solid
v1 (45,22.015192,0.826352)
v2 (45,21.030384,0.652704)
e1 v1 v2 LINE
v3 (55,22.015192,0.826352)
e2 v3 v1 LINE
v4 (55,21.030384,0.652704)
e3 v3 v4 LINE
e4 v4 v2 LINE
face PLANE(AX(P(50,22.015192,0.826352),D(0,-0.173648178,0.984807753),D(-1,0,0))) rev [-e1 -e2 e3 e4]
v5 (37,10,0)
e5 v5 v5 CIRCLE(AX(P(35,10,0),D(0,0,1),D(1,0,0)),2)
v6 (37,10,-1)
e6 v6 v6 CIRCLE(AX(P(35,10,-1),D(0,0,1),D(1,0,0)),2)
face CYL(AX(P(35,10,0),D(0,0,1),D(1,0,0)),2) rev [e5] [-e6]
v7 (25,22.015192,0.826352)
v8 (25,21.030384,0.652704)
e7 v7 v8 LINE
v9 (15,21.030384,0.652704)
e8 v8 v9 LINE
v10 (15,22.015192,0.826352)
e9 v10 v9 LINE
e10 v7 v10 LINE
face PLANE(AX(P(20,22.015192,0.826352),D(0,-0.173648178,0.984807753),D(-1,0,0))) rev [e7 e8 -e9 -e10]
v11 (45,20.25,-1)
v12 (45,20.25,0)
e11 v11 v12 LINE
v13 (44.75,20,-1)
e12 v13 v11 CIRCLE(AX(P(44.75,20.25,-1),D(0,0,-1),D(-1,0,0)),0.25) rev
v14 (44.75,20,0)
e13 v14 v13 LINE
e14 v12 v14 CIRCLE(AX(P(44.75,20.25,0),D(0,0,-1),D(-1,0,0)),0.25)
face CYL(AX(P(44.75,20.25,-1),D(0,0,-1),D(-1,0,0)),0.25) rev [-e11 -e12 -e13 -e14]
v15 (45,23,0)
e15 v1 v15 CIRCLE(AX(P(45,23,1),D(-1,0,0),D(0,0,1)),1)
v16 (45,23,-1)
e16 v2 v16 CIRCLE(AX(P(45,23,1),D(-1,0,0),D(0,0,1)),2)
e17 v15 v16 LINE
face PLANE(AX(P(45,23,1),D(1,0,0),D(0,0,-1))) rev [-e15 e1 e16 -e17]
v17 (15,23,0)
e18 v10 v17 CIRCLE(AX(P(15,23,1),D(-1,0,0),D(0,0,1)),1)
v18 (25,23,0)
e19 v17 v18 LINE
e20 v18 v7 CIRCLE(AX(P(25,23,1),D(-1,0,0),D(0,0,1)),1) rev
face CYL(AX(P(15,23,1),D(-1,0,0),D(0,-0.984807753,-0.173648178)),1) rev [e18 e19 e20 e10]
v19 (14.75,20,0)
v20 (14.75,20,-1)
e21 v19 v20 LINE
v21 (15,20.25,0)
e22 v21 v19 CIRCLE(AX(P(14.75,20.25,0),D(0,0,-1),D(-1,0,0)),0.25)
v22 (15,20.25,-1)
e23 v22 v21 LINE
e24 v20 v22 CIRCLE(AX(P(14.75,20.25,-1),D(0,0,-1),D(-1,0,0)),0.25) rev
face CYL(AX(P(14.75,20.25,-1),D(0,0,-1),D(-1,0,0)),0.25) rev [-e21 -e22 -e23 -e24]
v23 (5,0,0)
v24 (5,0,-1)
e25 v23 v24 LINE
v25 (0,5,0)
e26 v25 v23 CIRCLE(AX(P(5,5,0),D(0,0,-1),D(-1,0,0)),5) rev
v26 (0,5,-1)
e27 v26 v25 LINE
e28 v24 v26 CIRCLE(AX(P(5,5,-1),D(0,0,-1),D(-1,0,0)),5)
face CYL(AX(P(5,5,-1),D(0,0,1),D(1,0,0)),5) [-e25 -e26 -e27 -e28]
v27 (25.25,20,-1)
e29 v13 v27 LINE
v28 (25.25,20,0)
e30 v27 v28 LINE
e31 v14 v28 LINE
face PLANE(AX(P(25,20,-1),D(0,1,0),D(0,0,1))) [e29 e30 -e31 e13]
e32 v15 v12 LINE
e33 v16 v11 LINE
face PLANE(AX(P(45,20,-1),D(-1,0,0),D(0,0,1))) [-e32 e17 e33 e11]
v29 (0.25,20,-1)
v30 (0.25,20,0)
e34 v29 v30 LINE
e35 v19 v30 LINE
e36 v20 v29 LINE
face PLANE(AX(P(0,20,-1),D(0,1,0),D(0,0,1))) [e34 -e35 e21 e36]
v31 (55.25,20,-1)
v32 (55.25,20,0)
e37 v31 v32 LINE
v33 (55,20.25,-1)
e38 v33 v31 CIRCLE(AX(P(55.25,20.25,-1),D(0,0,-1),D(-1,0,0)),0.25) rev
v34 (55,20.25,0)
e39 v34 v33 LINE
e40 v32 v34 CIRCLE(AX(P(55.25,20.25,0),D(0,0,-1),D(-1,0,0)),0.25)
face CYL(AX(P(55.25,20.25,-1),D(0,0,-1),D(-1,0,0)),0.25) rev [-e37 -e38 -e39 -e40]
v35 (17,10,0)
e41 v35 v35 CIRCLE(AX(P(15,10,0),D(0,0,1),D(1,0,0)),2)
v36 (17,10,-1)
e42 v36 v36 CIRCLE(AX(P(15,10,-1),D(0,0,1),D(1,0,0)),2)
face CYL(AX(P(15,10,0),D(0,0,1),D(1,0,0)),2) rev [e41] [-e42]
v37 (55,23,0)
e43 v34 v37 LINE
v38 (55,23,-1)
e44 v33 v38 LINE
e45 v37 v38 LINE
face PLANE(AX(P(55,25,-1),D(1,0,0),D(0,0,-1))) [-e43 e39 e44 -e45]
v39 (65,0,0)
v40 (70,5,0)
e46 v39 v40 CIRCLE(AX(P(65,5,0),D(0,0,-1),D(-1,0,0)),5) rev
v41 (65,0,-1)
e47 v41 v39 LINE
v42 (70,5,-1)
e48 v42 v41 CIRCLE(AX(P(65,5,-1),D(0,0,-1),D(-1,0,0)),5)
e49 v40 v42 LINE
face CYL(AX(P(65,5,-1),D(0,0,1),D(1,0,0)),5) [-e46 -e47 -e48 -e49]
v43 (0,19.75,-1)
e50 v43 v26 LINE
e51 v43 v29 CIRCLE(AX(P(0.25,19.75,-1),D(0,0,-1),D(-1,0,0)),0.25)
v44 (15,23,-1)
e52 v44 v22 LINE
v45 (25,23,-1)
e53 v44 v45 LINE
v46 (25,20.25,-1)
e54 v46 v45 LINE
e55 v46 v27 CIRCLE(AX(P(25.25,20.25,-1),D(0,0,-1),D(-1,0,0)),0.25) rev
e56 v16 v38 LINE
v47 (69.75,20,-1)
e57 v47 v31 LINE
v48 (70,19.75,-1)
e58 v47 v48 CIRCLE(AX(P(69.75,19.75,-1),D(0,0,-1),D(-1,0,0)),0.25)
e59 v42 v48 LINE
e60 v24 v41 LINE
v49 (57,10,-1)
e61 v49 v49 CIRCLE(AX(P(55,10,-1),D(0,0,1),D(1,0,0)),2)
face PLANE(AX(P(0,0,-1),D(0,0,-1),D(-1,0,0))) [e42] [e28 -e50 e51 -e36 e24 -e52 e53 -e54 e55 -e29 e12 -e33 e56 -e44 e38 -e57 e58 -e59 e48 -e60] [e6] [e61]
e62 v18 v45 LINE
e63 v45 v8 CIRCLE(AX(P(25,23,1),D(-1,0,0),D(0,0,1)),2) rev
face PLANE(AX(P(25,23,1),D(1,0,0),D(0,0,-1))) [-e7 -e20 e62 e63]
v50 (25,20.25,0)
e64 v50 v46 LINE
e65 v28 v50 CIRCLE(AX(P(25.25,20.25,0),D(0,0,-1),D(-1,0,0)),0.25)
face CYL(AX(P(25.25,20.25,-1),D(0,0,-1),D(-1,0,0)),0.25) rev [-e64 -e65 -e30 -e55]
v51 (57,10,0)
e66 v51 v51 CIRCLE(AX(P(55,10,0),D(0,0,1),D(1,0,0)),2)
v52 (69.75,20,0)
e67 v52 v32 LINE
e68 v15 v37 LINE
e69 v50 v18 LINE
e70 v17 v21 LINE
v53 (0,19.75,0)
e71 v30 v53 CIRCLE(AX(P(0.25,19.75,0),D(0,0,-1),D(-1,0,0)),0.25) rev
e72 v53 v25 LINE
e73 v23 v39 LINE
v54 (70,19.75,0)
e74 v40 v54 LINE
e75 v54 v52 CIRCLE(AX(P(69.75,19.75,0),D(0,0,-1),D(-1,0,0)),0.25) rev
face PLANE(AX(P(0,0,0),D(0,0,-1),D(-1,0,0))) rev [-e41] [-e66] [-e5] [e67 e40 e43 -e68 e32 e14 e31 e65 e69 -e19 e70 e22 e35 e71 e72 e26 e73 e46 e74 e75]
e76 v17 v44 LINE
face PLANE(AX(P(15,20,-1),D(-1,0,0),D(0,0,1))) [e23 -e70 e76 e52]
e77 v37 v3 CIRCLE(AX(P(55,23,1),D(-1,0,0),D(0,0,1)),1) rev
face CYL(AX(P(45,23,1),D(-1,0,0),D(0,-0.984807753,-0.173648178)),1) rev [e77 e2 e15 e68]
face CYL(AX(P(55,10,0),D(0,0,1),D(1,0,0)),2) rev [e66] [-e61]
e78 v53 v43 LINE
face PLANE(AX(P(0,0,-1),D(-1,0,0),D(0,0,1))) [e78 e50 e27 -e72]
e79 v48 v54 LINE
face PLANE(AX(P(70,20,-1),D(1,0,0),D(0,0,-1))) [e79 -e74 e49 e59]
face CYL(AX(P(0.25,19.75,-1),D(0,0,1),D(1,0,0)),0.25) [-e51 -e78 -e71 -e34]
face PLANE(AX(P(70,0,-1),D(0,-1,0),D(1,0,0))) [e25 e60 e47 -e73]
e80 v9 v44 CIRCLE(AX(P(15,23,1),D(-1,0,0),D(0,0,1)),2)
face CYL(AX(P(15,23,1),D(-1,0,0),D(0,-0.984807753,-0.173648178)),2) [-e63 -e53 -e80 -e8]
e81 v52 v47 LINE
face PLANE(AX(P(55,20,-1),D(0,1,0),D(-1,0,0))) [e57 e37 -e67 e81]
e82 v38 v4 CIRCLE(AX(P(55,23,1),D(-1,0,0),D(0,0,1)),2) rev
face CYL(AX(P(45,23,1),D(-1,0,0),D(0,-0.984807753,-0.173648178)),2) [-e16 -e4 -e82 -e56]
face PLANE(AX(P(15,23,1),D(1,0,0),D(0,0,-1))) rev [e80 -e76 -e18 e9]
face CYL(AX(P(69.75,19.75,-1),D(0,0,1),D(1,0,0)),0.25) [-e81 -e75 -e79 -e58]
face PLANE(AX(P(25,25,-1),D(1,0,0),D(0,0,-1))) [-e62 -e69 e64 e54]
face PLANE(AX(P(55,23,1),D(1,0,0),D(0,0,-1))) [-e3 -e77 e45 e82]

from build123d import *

# Parameters (mm, degrees)
SM_BASE_FLANGE_1_DEPTH = 1
OTHER_START            = 15
OTHER_1_DEPTH          = 40
OTHER_1_2_DEPTH        = 10
OTHER_START_2          = 45
OTHER_1_3_DEPTH        = 10
HOLE_WIZARD_M12_1_D    = 4
FILLET_1_R             = 5
FILLET_2_R             = 0.25


# Read off the part's stored shape, not the designer's step: 햄1
# Sheet-metal steps are written as plain solids
with BuildPart() as part:
    # Sketch 1 → 베이스-플랜지1 (new body)
    with BuildSketch(Plane.XY):
        Polygon((0, 0), (0, 20), (15, 20), (15, 25), (25, 25), (25, 20), (45, 20), (45, 25), (55, 25), (55, 20), (70, 20), (70, 0), align=None)
    extrude(amount=-SM_BASE_FLANGE_1_DEPTH)

    # Other 1 outline → Other 1 (cut)
    with BuildSketch(Plane.YZ.offset(OTHER_START)):
        with BuildLine():
            Line((25, 0), (24.732050807, 0))
            ThreePointArc((24.732050807, 0), (24, -0.732050808), (23, -1))
            Line((23, -1), (25, -1))
            Line((25, -1), (25, 0))
        make_face()
    extrude(amount=OTHER_1_DEPTH, mode=Mode.SUBTRACT)

    # Other 1 2 outline → Other 1 2 (add)
    with BuildSketch(Plane.YZ.offset(OTHER_START)):
        with BuildLine():
            Line((21.030384494, 0.652703645), (22.015192247, 0.826351822))
            ThreePointArc((22.015192247, 0.826351822), (23.64278761, 1.766044443), (23, 0))
            Line((23, 0), (24.732050807, 0))
            ThreePointArc((24.732050807, 0), (23.347296355, 2.969615506), (21.030384494, 0.652703645))
        make_face()
    extrude(amount=OTHER_1_2_DEPTH)

    # Other 1 3 outline → Other 1 3 (add)
    with BuildSketch(Plane.YZ.offset(OTHER_START_2)):
        with BuildLine():
            Line((21.030384494, 0.652703645), (22.015192247, 0.826351822))
            ThreePointArc((22.015192247, 0.826351822), (23.64278761, 1.766044443), (23, 0))
            Line((23, 0), (24.732050807, 0))
            ThreePointArc((24.732050807, 0), (23.347296355, 2.969615506), (21.030384494, 0.652703645))
        make_face()
    extrude(amount=OTHER_1_3_DEPTH)

    # M12 여유 구멍1 (through all)
    with Locations(Plane(origin=(15, 10, 0), x_dir=(1, 0, 0), z_dir=(0, 0, 1))):
        with Locations((0, 0), (20, 0), (40, 0)):
            Hole(HOLE_WIZARD_M12_1_D / 2)

    # 필렛1
    fillet_1_edges = [part.edges().sort_by_distance(p)[0] for p in [
        (0, 0, -0.5),
        (70, 0, -0.5),
    ]]
    fillet(fillet_1_edges, radius=FILLET_1_R)

    # 필렛2
    fillet_2_edges = [part.edges().sort_by_distance(p)[0] for p in [
        (0, 20, -0.5),
        (15, 20, -0.5),
        (25, 20, -0.5),
        (45, 20, -0.5),
        (55, 20, -0.5),
        (70, 20, -0.5),
    ]]
    fillet(fillet_2_edges, radius=FILLET_2_R)


solid = part.part
